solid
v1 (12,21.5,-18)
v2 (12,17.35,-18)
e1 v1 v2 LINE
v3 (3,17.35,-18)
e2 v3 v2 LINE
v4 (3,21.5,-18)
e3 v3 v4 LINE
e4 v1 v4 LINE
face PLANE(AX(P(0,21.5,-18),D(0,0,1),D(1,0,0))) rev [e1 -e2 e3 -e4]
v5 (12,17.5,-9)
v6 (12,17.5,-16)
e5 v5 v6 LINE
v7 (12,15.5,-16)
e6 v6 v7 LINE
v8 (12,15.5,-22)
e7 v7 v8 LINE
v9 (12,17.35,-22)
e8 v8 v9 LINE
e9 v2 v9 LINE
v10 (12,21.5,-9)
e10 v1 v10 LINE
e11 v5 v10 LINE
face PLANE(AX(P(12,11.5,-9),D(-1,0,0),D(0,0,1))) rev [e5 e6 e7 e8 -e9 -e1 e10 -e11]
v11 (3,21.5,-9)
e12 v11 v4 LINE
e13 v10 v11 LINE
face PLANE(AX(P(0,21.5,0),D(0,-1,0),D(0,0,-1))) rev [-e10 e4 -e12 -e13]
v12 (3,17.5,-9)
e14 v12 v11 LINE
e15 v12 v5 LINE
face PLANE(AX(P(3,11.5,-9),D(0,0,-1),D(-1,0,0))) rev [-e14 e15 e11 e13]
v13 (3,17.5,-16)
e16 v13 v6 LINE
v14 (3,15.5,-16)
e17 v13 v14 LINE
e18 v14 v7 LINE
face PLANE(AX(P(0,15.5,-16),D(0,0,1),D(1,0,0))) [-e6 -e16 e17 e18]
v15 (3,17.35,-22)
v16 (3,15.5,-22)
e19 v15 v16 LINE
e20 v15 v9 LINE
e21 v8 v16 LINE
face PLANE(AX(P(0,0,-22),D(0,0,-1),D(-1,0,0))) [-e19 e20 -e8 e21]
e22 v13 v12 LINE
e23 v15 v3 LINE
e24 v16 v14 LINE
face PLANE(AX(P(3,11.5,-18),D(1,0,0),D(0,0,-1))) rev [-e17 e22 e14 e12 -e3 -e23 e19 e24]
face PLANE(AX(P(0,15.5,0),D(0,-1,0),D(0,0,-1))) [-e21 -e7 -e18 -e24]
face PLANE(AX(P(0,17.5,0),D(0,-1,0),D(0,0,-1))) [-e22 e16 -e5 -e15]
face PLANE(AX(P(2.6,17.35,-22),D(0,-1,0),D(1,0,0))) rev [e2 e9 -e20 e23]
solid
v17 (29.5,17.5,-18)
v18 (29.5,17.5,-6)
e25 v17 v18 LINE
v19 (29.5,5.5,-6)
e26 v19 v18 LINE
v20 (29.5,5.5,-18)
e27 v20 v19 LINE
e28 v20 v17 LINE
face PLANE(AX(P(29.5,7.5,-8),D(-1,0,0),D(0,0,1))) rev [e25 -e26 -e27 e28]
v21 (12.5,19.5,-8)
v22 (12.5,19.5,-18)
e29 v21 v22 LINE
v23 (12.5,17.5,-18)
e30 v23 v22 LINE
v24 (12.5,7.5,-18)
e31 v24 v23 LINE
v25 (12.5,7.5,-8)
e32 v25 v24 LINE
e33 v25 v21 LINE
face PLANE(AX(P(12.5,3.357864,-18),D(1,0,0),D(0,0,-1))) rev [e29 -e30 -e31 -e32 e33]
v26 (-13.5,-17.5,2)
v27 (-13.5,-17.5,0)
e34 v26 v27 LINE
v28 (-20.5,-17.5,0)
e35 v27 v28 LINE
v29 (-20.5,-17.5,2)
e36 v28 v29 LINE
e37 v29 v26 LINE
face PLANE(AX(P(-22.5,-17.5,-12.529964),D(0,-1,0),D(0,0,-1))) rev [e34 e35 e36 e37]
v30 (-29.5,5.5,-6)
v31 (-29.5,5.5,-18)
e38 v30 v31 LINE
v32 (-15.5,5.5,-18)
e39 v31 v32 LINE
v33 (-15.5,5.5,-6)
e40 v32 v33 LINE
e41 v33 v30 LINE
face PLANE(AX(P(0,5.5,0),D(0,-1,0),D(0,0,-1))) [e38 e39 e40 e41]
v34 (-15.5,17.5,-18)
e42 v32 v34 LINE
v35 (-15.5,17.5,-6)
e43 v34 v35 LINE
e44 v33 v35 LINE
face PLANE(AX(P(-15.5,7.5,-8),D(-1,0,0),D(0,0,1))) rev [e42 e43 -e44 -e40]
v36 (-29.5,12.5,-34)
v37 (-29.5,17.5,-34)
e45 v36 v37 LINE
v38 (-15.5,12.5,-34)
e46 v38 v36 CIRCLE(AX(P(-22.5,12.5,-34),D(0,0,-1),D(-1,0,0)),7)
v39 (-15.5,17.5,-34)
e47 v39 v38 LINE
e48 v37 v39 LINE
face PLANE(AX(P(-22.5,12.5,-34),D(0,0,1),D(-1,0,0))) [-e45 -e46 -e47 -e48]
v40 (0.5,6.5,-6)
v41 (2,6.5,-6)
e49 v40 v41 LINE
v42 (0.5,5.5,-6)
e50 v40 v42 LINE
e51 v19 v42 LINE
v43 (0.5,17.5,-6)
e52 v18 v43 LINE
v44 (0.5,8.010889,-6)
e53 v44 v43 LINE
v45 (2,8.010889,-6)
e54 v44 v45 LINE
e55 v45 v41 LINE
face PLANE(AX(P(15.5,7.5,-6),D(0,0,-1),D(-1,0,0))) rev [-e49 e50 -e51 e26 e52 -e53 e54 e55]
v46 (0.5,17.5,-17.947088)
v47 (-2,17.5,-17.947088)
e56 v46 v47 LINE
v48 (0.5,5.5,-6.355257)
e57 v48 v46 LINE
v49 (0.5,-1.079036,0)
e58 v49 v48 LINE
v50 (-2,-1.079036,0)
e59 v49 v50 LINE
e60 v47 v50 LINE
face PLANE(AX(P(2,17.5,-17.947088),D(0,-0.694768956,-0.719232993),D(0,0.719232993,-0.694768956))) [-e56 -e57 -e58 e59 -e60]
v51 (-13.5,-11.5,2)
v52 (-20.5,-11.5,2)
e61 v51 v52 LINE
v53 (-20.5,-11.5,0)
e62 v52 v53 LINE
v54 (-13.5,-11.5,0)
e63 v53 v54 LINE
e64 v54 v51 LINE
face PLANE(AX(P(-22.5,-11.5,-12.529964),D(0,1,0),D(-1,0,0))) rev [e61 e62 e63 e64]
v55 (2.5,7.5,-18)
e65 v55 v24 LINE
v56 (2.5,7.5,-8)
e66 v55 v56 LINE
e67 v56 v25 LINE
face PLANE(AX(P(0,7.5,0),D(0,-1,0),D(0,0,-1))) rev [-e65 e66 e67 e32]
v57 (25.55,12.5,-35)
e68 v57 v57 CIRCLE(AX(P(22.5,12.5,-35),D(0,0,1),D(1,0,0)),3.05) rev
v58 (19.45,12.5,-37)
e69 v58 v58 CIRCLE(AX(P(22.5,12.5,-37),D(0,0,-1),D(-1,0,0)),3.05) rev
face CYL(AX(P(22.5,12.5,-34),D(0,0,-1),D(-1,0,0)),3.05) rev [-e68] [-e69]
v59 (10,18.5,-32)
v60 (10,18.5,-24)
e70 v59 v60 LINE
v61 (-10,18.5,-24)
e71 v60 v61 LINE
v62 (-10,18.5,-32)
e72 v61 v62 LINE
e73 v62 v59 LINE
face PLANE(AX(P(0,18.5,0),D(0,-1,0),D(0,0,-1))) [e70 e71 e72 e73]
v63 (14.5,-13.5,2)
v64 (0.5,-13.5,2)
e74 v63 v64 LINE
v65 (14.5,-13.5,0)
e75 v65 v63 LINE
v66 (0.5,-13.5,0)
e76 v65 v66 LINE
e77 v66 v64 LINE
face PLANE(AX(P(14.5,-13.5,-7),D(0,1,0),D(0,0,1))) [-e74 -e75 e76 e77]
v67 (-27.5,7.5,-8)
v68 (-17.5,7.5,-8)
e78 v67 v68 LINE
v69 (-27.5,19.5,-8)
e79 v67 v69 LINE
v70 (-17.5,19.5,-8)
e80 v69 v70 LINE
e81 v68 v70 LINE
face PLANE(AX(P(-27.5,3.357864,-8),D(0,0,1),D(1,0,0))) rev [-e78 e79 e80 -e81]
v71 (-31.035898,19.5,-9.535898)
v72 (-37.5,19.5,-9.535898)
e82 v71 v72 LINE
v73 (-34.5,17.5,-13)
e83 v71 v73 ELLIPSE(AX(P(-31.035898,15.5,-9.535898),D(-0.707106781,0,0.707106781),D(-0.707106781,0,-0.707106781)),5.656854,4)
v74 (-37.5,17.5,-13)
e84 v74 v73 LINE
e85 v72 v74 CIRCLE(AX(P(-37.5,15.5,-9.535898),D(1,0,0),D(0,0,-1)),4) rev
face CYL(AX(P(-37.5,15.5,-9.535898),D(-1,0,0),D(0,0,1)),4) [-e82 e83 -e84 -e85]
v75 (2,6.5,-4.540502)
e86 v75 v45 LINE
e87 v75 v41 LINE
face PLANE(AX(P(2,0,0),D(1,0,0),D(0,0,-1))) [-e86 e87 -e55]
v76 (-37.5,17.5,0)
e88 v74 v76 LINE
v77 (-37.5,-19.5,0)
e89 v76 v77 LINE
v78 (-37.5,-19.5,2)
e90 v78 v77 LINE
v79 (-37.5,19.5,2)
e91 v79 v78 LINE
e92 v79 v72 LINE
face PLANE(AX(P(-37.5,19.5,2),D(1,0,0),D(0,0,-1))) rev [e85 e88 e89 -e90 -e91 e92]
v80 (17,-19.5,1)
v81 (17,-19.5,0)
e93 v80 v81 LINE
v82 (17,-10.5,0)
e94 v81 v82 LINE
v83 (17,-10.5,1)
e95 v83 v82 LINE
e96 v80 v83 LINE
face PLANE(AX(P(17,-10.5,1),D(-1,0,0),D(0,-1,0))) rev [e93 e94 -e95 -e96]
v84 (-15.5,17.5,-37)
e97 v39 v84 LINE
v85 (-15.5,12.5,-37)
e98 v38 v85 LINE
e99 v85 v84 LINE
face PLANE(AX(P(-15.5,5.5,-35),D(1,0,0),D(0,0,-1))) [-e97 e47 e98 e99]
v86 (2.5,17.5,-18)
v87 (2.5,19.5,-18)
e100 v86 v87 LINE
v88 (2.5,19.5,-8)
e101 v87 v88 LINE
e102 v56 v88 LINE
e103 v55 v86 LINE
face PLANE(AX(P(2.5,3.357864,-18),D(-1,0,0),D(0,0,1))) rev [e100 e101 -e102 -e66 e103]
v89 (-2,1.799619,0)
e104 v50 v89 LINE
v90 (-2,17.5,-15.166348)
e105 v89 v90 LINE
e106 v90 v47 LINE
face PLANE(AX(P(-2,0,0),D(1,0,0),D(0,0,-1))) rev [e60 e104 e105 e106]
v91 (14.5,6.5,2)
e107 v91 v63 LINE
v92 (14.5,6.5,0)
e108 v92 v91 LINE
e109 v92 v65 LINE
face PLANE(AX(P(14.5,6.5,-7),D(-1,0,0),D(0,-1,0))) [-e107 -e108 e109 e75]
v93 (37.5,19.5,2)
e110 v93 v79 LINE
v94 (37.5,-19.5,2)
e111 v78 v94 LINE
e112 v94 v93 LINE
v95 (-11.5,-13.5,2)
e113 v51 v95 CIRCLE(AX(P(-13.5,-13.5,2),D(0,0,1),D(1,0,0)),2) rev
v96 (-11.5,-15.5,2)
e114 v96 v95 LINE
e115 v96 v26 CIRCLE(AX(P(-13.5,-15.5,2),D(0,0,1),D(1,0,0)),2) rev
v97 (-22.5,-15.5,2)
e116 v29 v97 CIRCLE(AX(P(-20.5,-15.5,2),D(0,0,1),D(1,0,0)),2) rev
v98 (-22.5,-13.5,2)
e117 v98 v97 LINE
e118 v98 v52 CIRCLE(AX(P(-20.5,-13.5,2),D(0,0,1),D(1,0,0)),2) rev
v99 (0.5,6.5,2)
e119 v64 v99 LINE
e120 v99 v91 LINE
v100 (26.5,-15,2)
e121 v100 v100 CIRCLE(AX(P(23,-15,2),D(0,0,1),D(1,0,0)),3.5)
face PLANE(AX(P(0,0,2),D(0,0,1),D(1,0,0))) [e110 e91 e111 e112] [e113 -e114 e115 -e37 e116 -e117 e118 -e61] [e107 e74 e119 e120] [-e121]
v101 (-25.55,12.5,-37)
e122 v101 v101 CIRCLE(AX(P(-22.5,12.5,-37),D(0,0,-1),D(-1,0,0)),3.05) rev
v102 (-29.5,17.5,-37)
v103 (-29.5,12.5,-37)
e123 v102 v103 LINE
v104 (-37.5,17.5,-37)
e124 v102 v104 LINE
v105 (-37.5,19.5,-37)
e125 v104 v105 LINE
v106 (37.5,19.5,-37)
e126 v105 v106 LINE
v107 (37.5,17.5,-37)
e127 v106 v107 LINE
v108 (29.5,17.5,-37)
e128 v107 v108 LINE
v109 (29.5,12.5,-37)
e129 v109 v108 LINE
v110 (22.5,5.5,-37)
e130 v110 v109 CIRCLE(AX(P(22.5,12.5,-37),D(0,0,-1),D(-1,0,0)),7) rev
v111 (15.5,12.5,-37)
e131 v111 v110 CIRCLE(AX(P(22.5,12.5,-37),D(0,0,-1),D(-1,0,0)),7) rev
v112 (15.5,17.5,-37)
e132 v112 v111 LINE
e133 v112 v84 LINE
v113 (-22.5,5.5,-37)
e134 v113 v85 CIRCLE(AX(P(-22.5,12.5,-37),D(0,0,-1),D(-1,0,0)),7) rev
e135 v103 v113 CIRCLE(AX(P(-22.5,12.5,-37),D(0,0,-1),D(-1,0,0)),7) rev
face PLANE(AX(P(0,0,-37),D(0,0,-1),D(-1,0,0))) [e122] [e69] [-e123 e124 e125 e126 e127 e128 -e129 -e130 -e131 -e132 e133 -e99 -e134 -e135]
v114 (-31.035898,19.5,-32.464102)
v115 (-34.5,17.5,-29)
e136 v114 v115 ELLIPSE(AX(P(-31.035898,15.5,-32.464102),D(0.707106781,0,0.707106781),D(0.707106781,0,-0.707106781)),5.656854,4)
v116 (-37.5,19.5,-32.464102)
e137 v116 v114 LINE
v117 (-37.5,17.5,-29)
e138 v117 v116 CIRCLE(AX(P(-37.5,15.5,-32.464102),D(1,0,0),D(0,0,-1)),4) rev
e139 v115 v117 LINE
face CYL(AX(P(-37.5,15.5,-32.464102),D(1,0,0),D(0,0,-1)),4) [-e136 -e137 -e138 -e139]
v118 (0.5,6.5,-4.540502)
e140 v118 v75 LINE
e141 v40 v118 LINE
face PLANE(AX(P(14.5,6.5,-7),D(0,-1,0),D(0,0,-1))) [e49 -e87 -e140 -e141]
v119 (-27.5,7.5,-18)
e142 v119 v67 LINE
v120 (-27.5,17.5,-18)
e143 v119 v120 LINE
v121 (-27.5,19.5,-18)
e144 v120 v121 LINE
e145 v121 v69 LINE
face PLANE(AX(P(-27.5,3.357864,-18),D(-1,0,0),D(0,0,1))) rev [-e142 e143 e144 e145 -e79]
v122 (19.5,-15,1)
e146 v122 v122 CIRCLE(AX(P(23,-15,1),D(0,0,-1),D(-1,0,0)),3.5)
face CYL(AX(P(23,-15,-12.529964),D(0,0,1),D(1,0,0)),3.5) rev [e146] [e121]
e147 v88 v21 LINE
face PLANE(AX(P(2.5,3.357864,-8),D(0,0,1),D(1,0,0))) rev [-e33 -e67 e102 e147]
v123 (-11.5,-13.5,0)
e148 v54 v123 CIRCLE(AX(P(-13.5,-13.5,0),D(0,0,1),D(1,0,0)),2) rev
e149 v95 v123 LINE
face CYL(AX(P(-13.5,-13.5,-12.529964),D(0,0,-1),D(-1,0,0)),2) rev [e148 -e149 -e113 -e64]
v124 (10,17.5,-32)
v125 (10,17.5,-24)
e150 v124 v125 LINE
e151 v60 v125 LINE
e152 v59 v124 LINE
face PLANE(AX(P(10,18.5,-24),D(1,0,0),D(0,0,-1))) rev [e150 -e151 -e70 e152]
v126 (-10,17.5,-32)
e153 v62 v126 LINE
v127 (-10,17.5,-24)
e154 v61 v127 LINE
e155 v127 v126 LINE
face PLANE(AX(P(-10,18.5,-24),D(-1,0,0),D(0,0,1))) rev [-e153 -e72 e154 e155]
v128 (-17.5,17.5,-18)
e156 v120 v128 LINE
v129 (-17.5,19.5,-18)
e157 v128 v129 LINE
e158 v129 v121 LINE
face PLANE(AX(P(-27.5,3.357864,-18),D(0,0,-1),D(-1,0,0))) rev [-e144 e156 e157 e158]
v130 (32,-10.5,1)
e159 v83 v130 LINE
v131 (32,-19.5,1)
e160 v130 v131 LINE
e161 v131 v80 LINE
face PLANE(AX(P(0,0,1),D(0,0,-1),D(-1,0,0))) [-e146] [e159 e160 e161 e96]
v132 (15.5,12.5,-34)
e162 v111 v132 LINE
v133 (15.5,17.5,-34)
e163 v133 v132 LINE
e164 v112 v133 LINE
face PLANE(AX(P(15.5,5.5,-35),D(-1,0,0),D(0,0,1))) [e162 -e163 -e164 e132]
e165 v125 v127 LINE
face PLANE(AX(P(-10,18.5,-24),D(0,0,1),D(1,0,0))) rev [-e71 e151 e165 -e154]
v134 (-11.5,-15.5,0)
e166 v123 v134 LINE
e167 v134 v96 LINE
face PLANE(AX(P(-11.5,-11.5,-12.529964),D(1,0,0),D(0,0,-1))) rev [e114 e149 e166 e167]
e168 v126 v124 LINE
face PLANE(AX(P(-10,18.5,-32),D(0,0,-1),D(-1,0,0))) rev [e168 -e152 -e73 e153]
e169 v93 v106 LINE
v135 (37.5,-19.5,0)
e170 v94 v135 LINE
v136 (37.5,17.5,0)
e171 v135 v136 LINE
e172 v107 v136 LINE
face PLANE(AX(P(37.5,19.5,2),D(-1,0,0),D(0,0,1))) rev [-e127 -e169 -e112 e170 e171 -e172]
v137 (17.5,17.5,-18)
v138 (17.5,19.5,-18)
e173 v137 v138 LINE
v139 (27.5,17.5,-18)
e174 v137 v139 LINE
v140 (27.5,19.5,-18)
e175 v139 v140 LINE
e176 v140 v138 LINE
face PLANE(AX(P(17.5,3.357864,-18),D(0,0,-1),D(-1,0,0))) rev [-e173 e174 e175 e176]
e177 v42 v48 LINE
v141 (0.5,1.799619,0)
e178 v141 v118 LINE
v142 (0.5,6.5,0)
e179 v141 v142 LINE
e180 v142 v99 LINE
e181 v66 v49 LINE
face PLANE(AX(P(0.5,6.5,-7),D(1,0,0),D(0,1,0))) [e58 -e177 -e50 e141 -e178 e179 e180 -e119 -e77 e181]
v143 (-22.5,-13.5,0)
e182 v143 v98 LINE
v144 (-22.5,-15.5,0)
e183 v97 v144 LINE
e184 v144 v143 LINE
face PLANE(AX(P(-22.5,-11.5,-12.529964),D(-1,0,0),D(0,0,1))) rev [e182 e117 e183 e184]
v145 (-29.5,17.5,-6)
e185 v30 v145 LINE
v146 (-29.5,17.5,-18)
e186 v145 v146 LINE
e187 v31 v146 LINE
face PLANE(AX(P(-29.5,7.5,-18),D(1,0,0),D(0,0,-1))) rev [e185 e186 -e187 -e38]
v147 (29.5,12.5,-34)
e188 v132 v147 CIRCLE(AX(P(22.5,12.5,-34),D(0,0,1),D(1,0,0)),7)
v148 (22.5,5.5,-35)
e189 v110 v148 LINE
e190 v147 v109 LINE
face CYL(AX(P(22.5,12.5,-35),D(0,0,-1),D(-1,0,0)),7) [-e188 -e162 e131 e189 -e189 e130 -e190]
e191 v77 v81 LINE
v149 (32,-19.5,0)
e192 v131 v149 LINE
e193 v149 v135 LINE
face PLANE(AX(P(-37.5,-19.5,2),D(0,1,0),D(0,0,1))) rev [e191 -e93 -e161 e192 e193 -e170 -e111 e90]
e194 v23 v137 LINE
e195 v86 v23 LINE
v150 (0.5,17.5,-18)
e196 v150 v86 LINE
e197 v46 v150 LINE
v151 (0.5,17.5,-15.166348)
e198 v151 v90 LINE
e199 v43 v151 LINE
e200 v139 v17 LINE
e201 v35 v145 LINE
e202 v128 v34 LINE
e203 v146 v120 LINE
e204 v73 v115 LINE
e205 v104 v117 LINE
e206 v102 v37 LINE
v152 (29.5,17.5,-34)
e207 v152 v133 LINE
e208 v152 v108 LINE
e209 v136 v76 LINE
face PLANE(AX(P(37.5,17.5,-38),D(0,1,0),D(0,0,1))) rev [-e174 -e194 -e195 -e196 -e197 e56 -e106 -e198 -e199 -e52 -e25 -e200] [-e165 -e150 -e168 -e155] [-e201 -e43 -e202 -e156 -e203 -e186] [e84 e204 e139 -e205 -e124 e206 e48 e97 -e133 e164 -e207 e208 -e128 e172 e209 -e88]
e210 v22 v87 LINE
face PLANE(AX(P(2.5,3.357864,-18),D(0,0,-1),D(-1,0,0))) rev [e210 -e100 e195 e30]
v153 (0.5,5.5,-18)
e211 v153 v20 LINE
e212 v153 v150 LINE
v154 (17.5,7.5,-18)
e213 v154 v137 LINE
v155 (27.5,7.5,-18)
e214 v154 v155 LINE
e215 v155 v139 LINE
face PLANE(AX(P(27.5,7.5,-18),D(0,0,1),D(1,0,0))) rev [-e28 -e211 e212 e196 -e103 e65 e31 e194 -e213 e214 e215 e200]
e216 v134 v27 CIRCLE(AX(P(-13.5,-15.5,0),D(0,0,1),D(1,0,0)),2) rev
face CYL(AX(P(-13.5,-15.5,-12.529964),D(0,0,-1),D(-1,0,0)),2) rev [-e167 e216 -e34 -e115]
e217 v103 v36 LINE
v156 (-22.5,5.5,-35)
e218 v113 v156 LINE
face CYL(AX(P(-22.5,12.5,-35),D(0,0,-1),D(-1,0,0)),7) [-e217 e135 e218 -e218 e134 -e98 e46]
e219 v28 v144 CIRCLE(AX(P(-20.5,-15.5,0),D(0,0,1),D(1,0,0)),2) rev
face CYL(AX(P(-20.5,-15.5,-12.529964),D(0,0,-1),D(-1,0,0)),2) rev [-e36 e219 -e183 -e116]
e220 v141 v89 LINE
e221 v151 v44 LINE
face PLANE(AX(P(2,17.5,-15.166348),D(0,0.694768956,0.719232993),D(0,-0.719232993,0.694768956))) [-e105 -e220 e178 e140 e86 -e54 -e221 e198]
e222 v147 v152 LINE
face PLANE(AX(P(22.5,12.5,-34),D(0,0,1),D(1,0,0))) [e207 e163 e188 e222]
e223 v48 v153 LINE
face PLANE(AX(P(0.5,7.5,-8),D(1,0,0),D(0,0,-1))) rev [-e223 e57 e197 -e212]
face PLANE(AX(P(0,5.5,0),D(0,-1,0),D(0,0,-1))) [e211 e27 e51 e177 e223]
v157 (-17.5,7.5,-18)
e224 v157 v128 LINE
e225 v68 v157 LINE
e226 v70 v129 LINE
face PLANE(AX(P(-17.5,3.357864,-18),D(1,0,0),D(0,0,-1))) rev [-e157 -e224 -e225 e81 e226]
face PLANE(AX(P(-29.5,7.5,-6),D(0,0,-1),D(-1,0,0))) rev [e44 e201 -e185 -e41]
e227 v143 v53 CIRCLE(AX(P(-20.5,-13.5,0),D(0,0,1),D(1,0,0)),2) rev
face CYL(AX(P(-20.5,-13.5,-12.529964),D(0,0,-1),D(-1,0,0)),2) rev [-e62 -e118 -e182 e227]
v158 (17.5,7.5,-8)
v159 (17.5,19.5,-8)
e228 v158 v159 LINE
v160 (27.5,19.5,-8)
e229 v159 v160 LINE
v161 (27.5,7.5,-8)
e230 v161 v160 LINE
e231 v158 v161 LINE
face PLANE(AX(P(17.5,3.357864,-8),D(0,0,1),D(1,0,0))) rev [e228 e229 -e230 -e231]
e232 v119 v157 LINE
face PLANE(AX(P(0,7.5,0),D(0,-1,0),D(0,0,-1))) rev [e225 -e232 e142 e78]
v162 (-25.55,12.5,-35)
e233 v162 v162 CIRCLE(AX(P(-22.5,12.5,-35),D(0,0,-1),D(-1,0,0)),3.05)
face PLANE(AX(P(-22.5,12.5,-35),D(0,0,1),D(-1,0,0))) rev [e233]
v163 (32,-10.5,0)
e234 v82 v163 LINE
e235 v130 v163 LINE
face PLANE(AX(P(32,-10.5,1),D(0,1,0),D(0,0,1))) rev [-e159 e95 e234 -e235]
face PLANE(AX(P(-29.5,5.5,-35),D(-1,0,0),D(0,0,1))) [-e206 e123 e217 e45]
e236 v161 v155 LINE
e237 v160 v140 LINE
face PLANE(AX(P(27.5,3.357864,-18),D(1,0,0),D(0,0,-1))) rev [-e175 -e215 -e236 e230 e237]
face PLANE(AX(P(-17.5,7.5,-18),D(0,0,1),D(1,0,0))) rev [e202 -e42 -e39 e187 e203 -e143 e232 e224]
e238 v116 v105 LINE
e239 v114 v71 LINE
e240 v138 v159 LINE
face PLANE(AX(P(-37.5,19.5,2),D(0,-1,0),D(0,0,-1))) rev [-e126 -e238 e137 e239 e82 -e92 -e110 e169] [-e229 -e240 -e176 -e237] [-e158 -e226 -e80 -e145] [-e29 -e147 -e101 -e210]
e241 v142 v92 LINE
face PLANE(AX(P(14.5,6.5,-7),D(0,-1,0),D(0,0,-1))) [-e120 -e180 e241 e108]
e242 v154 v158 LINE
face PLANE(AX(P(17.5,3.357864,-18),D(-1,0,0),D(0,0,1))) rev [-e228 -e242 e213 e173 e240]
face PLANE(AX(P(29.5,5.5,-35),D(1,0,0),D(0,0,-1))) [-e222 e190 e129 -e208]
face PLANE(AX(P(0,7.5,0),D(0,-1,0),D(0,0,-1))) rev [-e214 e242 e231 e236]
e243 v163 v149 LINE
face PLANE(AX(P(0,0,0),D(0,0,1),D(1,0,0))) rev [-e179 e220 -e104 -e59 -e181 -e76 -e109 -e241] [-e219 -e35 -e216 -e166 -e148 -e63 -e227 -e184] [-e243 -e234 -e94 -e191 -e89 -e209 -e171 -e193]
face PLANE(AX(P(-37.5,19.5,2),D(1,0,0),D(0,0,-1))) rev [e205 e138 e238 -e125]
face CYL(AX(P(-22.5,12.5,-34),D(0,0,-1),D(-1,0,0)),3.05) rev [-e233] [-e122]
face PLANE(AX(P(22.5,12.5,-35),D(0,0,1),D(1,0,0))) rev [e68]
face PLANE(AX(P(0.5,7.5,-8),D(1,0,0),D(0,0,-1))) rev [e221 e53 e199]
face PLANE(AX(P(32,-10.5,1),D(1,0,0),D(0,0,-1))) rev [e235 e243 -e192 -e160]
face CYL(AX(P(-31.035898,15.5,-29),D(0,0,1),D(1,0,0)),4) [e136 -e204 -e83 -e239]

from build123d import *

# Parameters (mm, degrees)
SKETCH1_W                 = 75
SKETCH1_H                 = 39
BOSS_EXTRUDE1_DEPTH       = 2
SKETCH2_W                 = 75
SKETCH2_H                 = 2
BOSS_EXTRUDE2_DEPTH       = 38
SKETCH4_R                 = 3.5
SKETCH4_R_2               = 2.25
SKETCH4_W                 = 11
SKETCH4_H                 = 6
CUT_EXTRUDE1_DEPTH        = 2
SKETCH6_W                 = 10
SKETCH6_H                 = 10
CUT_EXTRUDE2_DEPTH        = 2
BOSS_EXTRUDE3_DEPTH       = 10
SKETCH8_W                 = 14
SKETCH8_H                 = 12
BOSS_EXTRUDE4_DEPTH       = 2
SKETCH9_W                 = 10
SKETCH9_H                 = 10
BOSS_EXTRUDE5_DEPTH       = 4
SKETCH10_W                = 9.9
SKETCH10_H                = 9.9
SKETCH10_W_2              = 5.9
SKETCH10_H_2              = 5.9
BOSS_EXTRUDE9_DEPTH       = 2
SKETCH11_W                = 9.9
SKETCH11_H                = 1.85
BOSS_EXTRUDE10_DEPTH      = 4
SKETCH12_R                = 4.25
SKETCH12_R_2              = 2.25
BOSS_EXTRUDE11_DEPTH      = 2
SKETCH16_W                = 14
SKETCH16_H                = 9.5
SKETCH16_W_2              = 11
SKETCH16_H_2              = 6
BOSS_EXTRUDE13_DEPTH      = 2
CUT_EXTRUDE3_DEPTH        = 65.955754172
FILLET1_R                 = 2
FILLET2_R                 = 2
BOSS_EXTRUDE14_DEPTH      = 2
BOSS_EXTRUDE14_DEPTH_BACK = 2
CUT_EXTRUDE4_DEPTH        = 7
CUT_EXTRUDE4_DEPTH_BACK   = 10
SKETCH19_W                = 14
SKETCH19_H                = 20
SKETCH22_W                = 14
SKETCH22_H                = 14
BOSS_EXTRUDE15_DEPTH      = 3
FILLET3_R                 = 7
SKETCH23_R                = 3.05
CUT_EXTRUDE6_DEPTH        = 4
SKETCH24_W                = 1
SKETCH24_H                = 12
BOSS_EXTRUDE16_DEPTH      = 12
SKETCH25_W                = 16.318850604
SKETCH25_H                = 8.975597068
SKETCH25_W_2              = 14
SKETCH25_H_2              = 9.692484115
CUT_EXTRUDE7_DEPTH        = 2
CUT_EXTRUDE8_START        = -2
SKETCH26_R                = 4.25
CUT_EXTRUDE8_DEPTH        = 2
SKETCH27_R                = 2.25
BOSS_EXTRUDE17_DEPTH      = 2
SKETCH28_W                = 85.525995753
SKETCH28_H                = 26.786934063
CUT_EXTRUDE9_DEPTH        = 1
BOSS_EXTRUDE18_DEPTH      = 1
CUT_EXTRUDE10_DEPTH       = 10
CUT_EXTRUDE11_START       = -1
SKETCH31_W                = 15
SKETCH31_H                = 9
SKETCH31_R                = 3.5
CUT_EXTRUDE11_DEPTH       = 1
SKETCH32_W                = 20
SKETCH32_H                = 8
CUT_EXTRUDE12_DEPTH       = 1
BOSS_EXTRUDE19_START      = -1
SKETCH34_W                = 14
SKETCH34_H                = 1
BOSS_EXTRUDE19_DEPTH      = 1
SKETCH35_W                = 3
SKETCH35_H                = 16
CUT_EXTRUDE13_DEPTH       = 66.545785524
FILLET4_R                 = 4
SKETCH36_W                = 0.4
SKETCH36_H                = 4
CUT_EXTRUDE14_DEPTH       = 10
SKETCH38_W                = 9.5
SKETCH38_H                = 7.5
CUT_EXTRUDE15_DEPTH       = 2
CUT_EXTRUDE16_DEPTH       = 10


# Some blends are built 0.0001 mm under size
with BuildPart() as part:
    # Sketch1 → Boss-Extrude1 (new body)
    with BuildSketch(Plane.XY):
        Rectangle(SKETCH1_W, SKETCH1_H)
    extrude(amount=BOSS_EXTRUDE1_DEPTH)

    # Sketch2 → Boss-Extrude2 (add)
    with BuildSketch(Plane(origin=(0, 0, 0), x_dir=(-1, 0, 0), z_dir=(0, 0, -1))):
        with Locations((0, 18.5)):
            Rectangle(SKETCH2_W, SKETCH2_H)
    extrude(amount=BOSS_EXTRUDE2_DEPTH)

    # Sketch4 → Cut-Extrude1 (cut)
    with BuildSketch(Plane.XY.offset(2)):
        with Locations((23, -15)):
            Circle(SKETCH4_R)
        with Locations((23, 4.5)):
            Circle(SKETCH4_R_2)
        with Locations((-17, -14.5)):
            Rectangle(SKETCH4_W, SKETCH4_H)
    extrude(amount=-CUT_EXTRUDE1_DEPTH, mode=Mode.SUBTRACT)

    # Sketch6 → Cut-Extrude2 (cut)
    with BuildSketch(Plane(origin=(0, 19.5, 0), x_dir=(1, 0, 0), z_dir=(0, 1, 0))):
        with Locations((7.5, 13)):
            Rectangle(SKETCH6_W, SKETCH6_H)
        with Locations((22.5, 13)):
            Rectangle(SKETCH6_W, SKETCH6_H)
        with Locations((-22.5, 13)):
            Rectangle(SKETCH6_W, SKETCH6_H)
    extrude(amount=-CUT_EXTRUDE2_DEPTH, mode=Mode.SUBTRACT)

    # Sketch7 → Boss-Extrude3 (add)
    with BuildSketch(Plane.XZ.offset(-17.5)):
        Polygon((17.5, -8), (17.5, -18), (15.5, -18), (15.5, -8), (15.5, -6), (29.5, -6), (29.5, -8), (29.5, -18), (27.5, -18), (27.5, -8), align=None)
        Polygon((2.5, -8), (2.5, -18), (0.5, -18), (0.5, -8), (0.5, -6), (14.5, -6), (14.5, -8), (14.5, -18), (12.5, -18), (12.5, -8), align=None)
        Polygon((-17.5, -8), (-17.5, -18), (-15.5, -18), (-15.5, -8), (-15.5, -6), (-29.5, -6), (-29.5, -8), (-29.5, -18), (-27.5, -18), (-27.5, -8), align=None)
    extrude(amount=BOSS_EXTRUDE3_DEPTH)

    # Sketch8 → Boss-Extrude4 (add)
    with BuildSketch(Plane.XZ.offset(-7.5)):
        with Locations((-22.5, -12)):
            Rectangle(SKETCH8_W, SKETCH8_H)
        with Locations((7.5, -12)):
            Rectangle(SKETCH8_W, SKETCH8_H)
        with Locations((22.5, -12)):
            Rectangle(SKETCH8_W, SKETCH8_H)
    extrude(amount=BOSS_EXTRUDE4_DEPTH)

    # Sketch12 → Boss-Extrude11 (add)
    with BuildSketch(Plane(origin=(0, 0, 0), x_dir=(-1, 0, 0), z_dir=(0, 0, -1))):
        with Locations(Location((-23, 4.5, 0), (0, 0, 180))):
            Circle(SKETCH12_R)
        with Locations(Location((-23, 4.5, 0), (0, 0, 180))):
            Circle(SKETCH12_R_2, mode=Mode.SUBTRACT)
    extrude(amount=BOSS_EXTRUDE11_DEPTH)

    # Sketch16 → Boss-Extrude13 (add)
    with BuildSketch(Plane(origin=(0, 0, 0), x_dir=(-1, 0, 0), z_dir=(0, 0, -1))):
        with Locations((17, -14.75)):
            Rectangle(SKETCH16_W, SKETCH16_H)
        with Locations((17, -14.5)):
            Rectangle(SKETCH16_W_2, SKETCH16_H_2, mode=Mode.SUBTRACT)
    extrude(amount=BOSS_EXTRUDE13_DEPTH)

    # Fillet1
    fillet1_edges = [part.edges().sort_by_distance(p)[0] for p in [
        (-22.5, -17.5, 0),
        (-22.5, -11.5, 0),
        (-11.5, -11.5, 0),
        (-11.5, -17.5, 0),
    ]]
    fillet(fillet1_edges, radius=FILLET1_R)

    # Fillet2
    fillet2_edges = [part.edges().sort_by_distance(p)[0] for p in [
        (-10, -10, -1),
        (-24, -10, -1),
    ]]
    fillet(fillet2_edges, radius=FILLET2_R)

    # Sketch18 → Boss-Extrude14 (add, two sides: drawn at the far end of the back side and taken through both)
    with BuildSketch(Plane.ZY.offset(-BOSS_EXTRUDE14_DEPTH_BACK)):
        Polygon((-15.16634768, 17.5), (0, 1.799618541), (0, -1.079036274), (-17.947087746, 17.5), align=None)
    extrude(amount=BOSS_EXTRUDE14_DEPTH + BOSS_EXTRUDE14_DEPTH_BACK)

    # Sketch19 → Cut-Extrude4 (cut, two sides: drawn at the far end of the back side and taken through both)
    with BuildSketch(Plane(origin=(0, 0, 0), x_dir=(-1, 0, 0), z_dir=(0, 0, -1)).offset(-CUT_EXTRUDE4_DEPTH_BACK)):
        with Locations((-7.5, -3.5)):
            Rectangle(SKETCH19_W, SKETCH19_H)
    extrude(amount=CUT_EXTRUDE4_DEPTH + CUT_EXTRUDE4_DEPTH_BACK, mode=Mode.SUBTRACT)

    # Sketch22 → Boss-Extrude15 (add)
    with BuildSketch(Plane(origin=(0, 0, -38), x_dir=(-1, 0, 0), z_dir=(0, 0, -1))):
        with Locations((-22.5, 12.5)):
            Rectangle(SKETCH22_W, SKETCH22_H)
        with Locations((22.5, 12.5)):
            Rectangle(SKETCH22_W, SKETCH22_H)
    extrude(amount=-BOSS_EXTRUDE15_DEPTH)

    # Fillet3
    fillet3_edges = [part.edges().sort_by_distance(p)[0] for p in [
        (-29.5, 5.5, -36.5),
        (-15.5, 5.5, -36.5),
        (15.5, 5.5, -36.5),
        (29.5, 5.5, -36.5),
    ]]
    fillet(fillet3_edges, radius=FILLET3_R - 0.0001)  # a hair under: the kernel refuses the full size

    # Sketch23 → Cut-Extrude6 (cut)
    with BuildSketch(Plane(origin=(0, 0, -38), x_dir=(-1, 0, 0), z_dir=(0, 0, -1))):
        with Locations((-22.5, 12.5)):
            Circle(SKETCH23_R)
        with Locations((22.5, 12.5)):
            Circle(SKETCH23_R)
    extrude(amount=-CUT_EXTRUDE6_DEPTH, mode=Mode.SUBTRACT)

    # Sketch24 → Boss-Extrude16 (add)
    with BuildSketch(Plane.XZ.offset(-5.5)):
        with Locations((15, -12)):
            Rectangle(SKETCH24_W, SKETCH24_H)
    extrude(amount=-BOSS_EXTRUDE16_DEPTH)

    # Sketch25 → Cut-Extrude7 (cut)
    with BuildSketch(Plane(origin=(0, 0, -2), x_dir=(-1, 0, 0), z_dir=(0, 0, -1))):
        with Locations((-23, -15)):
            Rectangle(SKETCH25_W, SKETCH25_H)
        with Locations((17, -14.653757943)):
            Rectangle(SKETCH25_W_2, SKETCH25_H_2)
    extrude(amount=-CUT_EXTRUDE7_DEPTH, mode=Mode.SUBTRACT)

    # Sketch26 → Cut-Extrude8 (cut)
    with BuildSketch(Plane(origin=(0, 0, -2), x_dir=(-1, 0, 0), z_dir=(0, 0, -1)).offset(CUT_EXTRUDE8_START)):
        with Locations((-23, 4.5)):
            Circle(SKETCH26_R)
    extrude(amount=CUT_EXTRUDE8_DEPTH, mode=Mode.SUBTRACT)

    # Sketch27 → Boss-Extrude17 (add)
    with BuildSketch(Plane.XY.offset(2)):
        with Locations((23, 4.5)):
            Circle(SKETCH27_R)
    extrude(amount=-BOSS_EXTRUDE17_DEPTH)

    # Sketch28 → Cut-Extrude9 (cut)
    with BuildSketch(Plane(origin=(0, 0, -38), x_dir=(-1, 0, 0), z_dir=(0, 0, -1))):
        with Locations((0.270543114, 11.591218851)):
            Rectangle(SKETCH28_W, SKETCH28_H)
    extrude(amount=-CUT_EXTRUDE9_DEPTH, mode=Mode.SUBTRACT)

    # Sketch29 → Boss-Extrude18 (add)
    with BuildSketch(Plane.XY.offset(-35)):
        with BuildLine():
            Line((15.5, 17.5), (29.5, 17.5))
            Line((29.5, 17.5), (29.5, 12.5))
            ThreePointArc((29.5, 12.5), (22.5, 5.5), (15.5, 12.5))
            Line((15.5, 12.5), (15.5, 17.5))
        make_face()
    boss_extrude18 = extrude(amount=BOSS_EXTRUDE18_DEPTH)

    # Mirror1: Boss-Extrude18 across plane
    add(boss_extrude18.mirror(Plane.ZY))

    # Sketch31 → Cut-Extrude11 (cut)
    with BuildSketch(Plane(origin=(0, 0, 0), x_dir=(-1, 0, 0), z_dir=(0, 0, -1)).offset(CUT_EXTRUDE11_START)):
        with Locations((-24.5, -15)):
            Rectangle(SKETCH31_W, SKETCH31_H)
        with Locations(Location((-23, -15, 0), (0, 0, 180))):
            Circle(SKETCH31_R, mode=Mode.SUBTRACT)
    extrude(amount=CUT_EXTRUDE11_DEPTH, mode=Mode.SUBTRACT)

    # Sketch32 → Cut-Extrude12 (cut)
    with BuildSketch(Plane.XZ.offset(-17.5)):
        with Locations((0, -28)):
            Rectangle(SKETCH32_W, SKETCH32_H)
    extrude(amount=-CUT_EXTRUDE12_DEPTH, mode=Mode.SUBTRACT)

    # Sketch34 → Boss-Extrude19 (add)
    with BuildSketch(Plane.XZ.offset(-5.5).offset(BOSS_EXTRUDE19_START)):
        with Locations((7.5, -6.5)):
            Rectangle(SKETCH34_W, SKETCH34_H)
    extrude(amount=BOSS_EXTRUDE19_DEPTH)

    # Sketch35 → Cut-Extrude13 (cut, through all)
    with BuildSketch(Plane(origin=(0, 19.5, 0), x_dir=(1, 0, 0), z_dir=(0, 1, 0))):
        with Locations((-36, 21)):
            Rectangle(SKETCH35_W, SKETCH35_H)
    extrude(amount=-CUT_EXTRUDE13_DEPTH, mode=Mode.SUBTRACT)

    # Fillet4
    # the kernel refuses this fillet: 4 mm, written as the material it takes off along each edge
    with BuildSketch(Plane(origin=(-34.5, 19.5, -13), x_dir=(0, 0, 1), z_dir=(-1, 0, 0)), Plane(origin=(-46.160254038, 19.5, -29), x_dir=(0, 0, -1), z_dir=(1, 0, 0))) as fillet4_piece_1:
        with BuildLine():
            CenterArc((3.464101615, -4), FILLET4_R, 90, 60)
            Line((0, -2), (-0.069282032, -1.96))
            ThreePointArc((-0.069282032, -1.96), (-0.08, -1), (-0.08, 0))
            Line((-0.08, 0), (0, 0.08))
            Line((0, 0.08), (3.464101615, 0.08))
            Line((3.464101615, 0.08), (3.464101615, 0))
        make_face()
    extrude(amount=11.660254038, mode=Mode.SUBTRACT)
    with BuildSketch(Plane(origin=(-34.5, 19.5, -29), x_dir=(1, 0, 0), z_dir=(0, 0, 1))) as fillet4_piece_2:
        with BuildLine():
            CenterArc((3.464101615, -4), FILLET4_R, 90, 60)
            Line((0, -2), (-0.069282032, -1.96))
            ThreePointArc((-0.069282032, -1.96), (-0.08, -1), (-0.08, 0))
            Line((-0.08, 0), (0, 0.08))
            Line((0, 0.08), (3.464101615, 0.08))
            Line((3.464101615, 0.08), (3.464101615, 0))
        make_face()
    extrude(amount=16, mode=Mode.SUBTRACT)
    with BuildSketch(Plane(origin=(-25.839745962, 19.5, -13), x_dir=(0, 0, 1), z_dir=(-1, 0, 0))) as fillet4_piece_3a_section:
        with BuildLine():
            CenterArc((3.464101615, -4), FILLET4_R, 90, 60)
            Line((0, -2), (-0.069282032, -1.96))
            ThreePointArc((-0.069282032, -1.96), (-0.08, -1), (-0.08, 0))
            Line((-0.08, 0), (0, 0.08))
            Line((0, 0.08), (3.464101615, 0.08))
            Line((3.464101615, 0.08), (3.464101615, 0))
        make_face()
    fillet4_piece_3a = extrude(amount=20.320508076, mode=Mode.PRIVATE)
    fillet4_piece_3a = split(fillet4_piece_3a, bisect_by=Plane(origin=(-34.5, 18.981933156, -12.134758217), z_dir=(1, 0, 0)), keep=Keep.TOP, mode=Mode.PRIVATE)
    with BuildSketch(Plane(origin=(-34.5, 19.5, -29), x_dir=(1, 0, 0), z_dir=(0, 0, 1))) as fillet4_piece_3b_section:
        with BuildLine():
            CenterArc((3.464101615, -4), FILLET4_R, 90, 60)
            Line((0, -2), (-0.069282032, -1.96))
            ThreePointArc((-0.069282032, -1.96), (-0.08, -1), (-0.08, 0))
            Line((-0.08, 0), (0, 0.08))
            Line((0, 0.08), (3.464101615, 0.08))
            Line((3.464101615, 0.08), (3.464101615, 0))
        make_face()
    fillet4_piece_3b = extrude(amount=24.660254038, mode=Mode.PRIVATE)
    fillet4_piece_3b = split(fillet4_piece_3b, bisect_by=Plane(origin=(-33.634758217, 18.981933156, -13), z_dir=(0, 0, 1)), keep=Keep.TOP, mode=Mode.PRIVATE)
    fillet4_piece_3 = fillet4_piece_3a & fillet4_piece_3b
    add(fillet4_piece_3, mode=Mode.SUBTRACT)
    with BuildSketch(Plane(origin=(-34.5, 19.5, -37.660254038), x_dir=(1, 0, 0), z_dir=(0, 0, 1))) as fillet4_piece_4a_section:
        with BuildLine():
            CenterArc((3.464101615, -4), FILLET4_R, 90, 60)
            Line((0, -2), (-0.069282032, -1.96))
            ThreePointArc((-0.069282032, -1.96), (-0.08, -1), (-0.08, 0))
            Line((-0.08, 0), (0, 0.08))
            Line((0, 0.08), (3.464101615, 0.08))
            Line((3.464101615, 0.08), (3.464101615, 0))
        make_face()
    fillet4_piece_4a = extrude(amount=24.660254038, mode=Mode.PRIVATE)
    fillet4_piece_4a = split(fillet4_piece_4a, bisect_by=Plane(origin=(-33.634758217, 18.981933156, -29), z_dir=(0, 0, -1)), keep=Keep.TOP, mode=Mode.PRIVATE)
    with BuildSketch(Plane(origin=(-46.160254038, 19.5, -29), x_dir=(0, 0, -1), z_dir=(1, 0, 0))) as fillet4_piece_4b_section:
        with BuildLine():
            CenterArc((3.464101615, -4), FILLET4_R, 90, 60)
            Line((0, -2), (-0.069282032, -1.96))
            ThreePointArc((-0.069282032, -1.96), (-0.08, -1), (-0.08, 0))
            Line((-0.08, 0), (0, 0.08))
            Line((0, 0.08), (3.464101615, 0.08))
            Line((3.464101615, 0.08), (3.464101615, 0))
        make_face()
    fillet4_piece_4b = extrude(amount=20.320508076, mode=Mode.PRIVATE)
    fillet4_piece_4b = split(fillet4_piece_4b, bisect_by=Plane(origin=(-34.5, 18.981933156, -29.865241783), z_dir=(1, 0, 0)), keep=Keep.TOP, mode=Mode.PRIVATE)
    fillet4_piece_4 = fillet4_piece_4a & fillet4_piece_4b
    add(fillet4_piece_4, mode=Mode.SUBTRACT)


with BuildPart() as body_2:
    # Sketch9 → Boss-Extrude5 (new body)
    with BuildSketch(Plane.XZ.offset(-17.5)):
        with Locations((7.5, -13)):
            Rectangle(SKETCH9_W, SKETCH9_H)
    extrude(amount=-BOSS_EXTRUDE5_DEPTH)

    # Sketch10 → Boss-Extrude9 (add)
    with BuildSketch(Plane.XZ.offset(-17.5)):
        with Locations((7.55, -13.05)):
            Rectangle(SKETCH10_W, SKETCH10_H)
        with Locations((7.55, -13.05)):
            Rectangle(SKETCH10_W_2, SKETCH10_H_2, mode=Mode.SUBTRACT)
    extrude(amount=BOSS_EXTRUDE9_DEPTH)

    # Sketch11 → Boss-Extrude10 (add)
    with BuildSketch(Plane(origin=(0, 0, -18), x_dir=(-1, 0, 0), z_dir=(0, 0, -1))):
        with Locations((-7.55, 16.425)):
            Rectangle(SKETCH11_W, SKETCH11_H)
    extrude(amount=BOSS_EXTRUDE10_DEPTH)

    # Sketch17 → Cut-Extrude3 (cut, through all)
    with BuildSketch(Plane.XZ.offset(-17.5)):
        Polygon((2.5, -8.1), (2.5, -18), (2.6, -18), (2.6, -8.1), (12.5, -8.1), (12.5, -8), (2.6, -8), (2.5, -8), align=None)
    extrude(amount=-CUT_EXTRUDE3_DEPTH, mode=Mode.SUBTRACT)

    # Sketch30 → Cut-Extrude10 (cut)
    with BuildSketch(Plane(origin=(0, 21.5, 0), x_dir=(1, 0, 0), z_dir=(0, 1, 0))):
        Polygon((2.5, 18), (3, 18), (3, 8.5), (12.5, 8.5), (12.5, 8), (2.5, 8), align=None)
    extrude(amount=-CUT_EXTRUDE10_DEPTH, mode=Mode.SUBTRACT)

    # Sketch36 → Cut-Extrude14 (cut)
    with BuildSketch(Plane.XZ.offset(-15.5)):
        with Locations((2.8, -20)):
            Rectangle(SKETCH36_W, SKETCH36_H)
    extrude(amount=-CUT_EXTRUDE14_DEPTH, mode=Mode.SUBTRACT)

    # Sketch38 → Cut-Extrude15 (cut)
    with BuildSketch(Plane.XZ.offset(-15.5)):
        with Locations((7.75, -12.25)):
            Rectangle(SKETCH38_W, SKETCH38_H)
    extrude(amount=-CUT_EXTRUDE15_DEPTH, mode=Mode.SUBTRACT)

    # Sketch39 → Cut-Extrude16 (cut)
    with BuildSketch(Plane(origin=(0, 21.5, 0), x_dir=(1, 0, 0), z_dir=(0, 1, 0))):
        Polygon((12.5, 8.5), (3, 8.5), (3, 9), (12, 9), (12, 22), (12.5, 22), align=None)
    extrude(amount=-CUT_EXTRUDE16_DEPTH, mode=Mode.SUBTRACT)


solid = Compound([part.part, body_2.part])
